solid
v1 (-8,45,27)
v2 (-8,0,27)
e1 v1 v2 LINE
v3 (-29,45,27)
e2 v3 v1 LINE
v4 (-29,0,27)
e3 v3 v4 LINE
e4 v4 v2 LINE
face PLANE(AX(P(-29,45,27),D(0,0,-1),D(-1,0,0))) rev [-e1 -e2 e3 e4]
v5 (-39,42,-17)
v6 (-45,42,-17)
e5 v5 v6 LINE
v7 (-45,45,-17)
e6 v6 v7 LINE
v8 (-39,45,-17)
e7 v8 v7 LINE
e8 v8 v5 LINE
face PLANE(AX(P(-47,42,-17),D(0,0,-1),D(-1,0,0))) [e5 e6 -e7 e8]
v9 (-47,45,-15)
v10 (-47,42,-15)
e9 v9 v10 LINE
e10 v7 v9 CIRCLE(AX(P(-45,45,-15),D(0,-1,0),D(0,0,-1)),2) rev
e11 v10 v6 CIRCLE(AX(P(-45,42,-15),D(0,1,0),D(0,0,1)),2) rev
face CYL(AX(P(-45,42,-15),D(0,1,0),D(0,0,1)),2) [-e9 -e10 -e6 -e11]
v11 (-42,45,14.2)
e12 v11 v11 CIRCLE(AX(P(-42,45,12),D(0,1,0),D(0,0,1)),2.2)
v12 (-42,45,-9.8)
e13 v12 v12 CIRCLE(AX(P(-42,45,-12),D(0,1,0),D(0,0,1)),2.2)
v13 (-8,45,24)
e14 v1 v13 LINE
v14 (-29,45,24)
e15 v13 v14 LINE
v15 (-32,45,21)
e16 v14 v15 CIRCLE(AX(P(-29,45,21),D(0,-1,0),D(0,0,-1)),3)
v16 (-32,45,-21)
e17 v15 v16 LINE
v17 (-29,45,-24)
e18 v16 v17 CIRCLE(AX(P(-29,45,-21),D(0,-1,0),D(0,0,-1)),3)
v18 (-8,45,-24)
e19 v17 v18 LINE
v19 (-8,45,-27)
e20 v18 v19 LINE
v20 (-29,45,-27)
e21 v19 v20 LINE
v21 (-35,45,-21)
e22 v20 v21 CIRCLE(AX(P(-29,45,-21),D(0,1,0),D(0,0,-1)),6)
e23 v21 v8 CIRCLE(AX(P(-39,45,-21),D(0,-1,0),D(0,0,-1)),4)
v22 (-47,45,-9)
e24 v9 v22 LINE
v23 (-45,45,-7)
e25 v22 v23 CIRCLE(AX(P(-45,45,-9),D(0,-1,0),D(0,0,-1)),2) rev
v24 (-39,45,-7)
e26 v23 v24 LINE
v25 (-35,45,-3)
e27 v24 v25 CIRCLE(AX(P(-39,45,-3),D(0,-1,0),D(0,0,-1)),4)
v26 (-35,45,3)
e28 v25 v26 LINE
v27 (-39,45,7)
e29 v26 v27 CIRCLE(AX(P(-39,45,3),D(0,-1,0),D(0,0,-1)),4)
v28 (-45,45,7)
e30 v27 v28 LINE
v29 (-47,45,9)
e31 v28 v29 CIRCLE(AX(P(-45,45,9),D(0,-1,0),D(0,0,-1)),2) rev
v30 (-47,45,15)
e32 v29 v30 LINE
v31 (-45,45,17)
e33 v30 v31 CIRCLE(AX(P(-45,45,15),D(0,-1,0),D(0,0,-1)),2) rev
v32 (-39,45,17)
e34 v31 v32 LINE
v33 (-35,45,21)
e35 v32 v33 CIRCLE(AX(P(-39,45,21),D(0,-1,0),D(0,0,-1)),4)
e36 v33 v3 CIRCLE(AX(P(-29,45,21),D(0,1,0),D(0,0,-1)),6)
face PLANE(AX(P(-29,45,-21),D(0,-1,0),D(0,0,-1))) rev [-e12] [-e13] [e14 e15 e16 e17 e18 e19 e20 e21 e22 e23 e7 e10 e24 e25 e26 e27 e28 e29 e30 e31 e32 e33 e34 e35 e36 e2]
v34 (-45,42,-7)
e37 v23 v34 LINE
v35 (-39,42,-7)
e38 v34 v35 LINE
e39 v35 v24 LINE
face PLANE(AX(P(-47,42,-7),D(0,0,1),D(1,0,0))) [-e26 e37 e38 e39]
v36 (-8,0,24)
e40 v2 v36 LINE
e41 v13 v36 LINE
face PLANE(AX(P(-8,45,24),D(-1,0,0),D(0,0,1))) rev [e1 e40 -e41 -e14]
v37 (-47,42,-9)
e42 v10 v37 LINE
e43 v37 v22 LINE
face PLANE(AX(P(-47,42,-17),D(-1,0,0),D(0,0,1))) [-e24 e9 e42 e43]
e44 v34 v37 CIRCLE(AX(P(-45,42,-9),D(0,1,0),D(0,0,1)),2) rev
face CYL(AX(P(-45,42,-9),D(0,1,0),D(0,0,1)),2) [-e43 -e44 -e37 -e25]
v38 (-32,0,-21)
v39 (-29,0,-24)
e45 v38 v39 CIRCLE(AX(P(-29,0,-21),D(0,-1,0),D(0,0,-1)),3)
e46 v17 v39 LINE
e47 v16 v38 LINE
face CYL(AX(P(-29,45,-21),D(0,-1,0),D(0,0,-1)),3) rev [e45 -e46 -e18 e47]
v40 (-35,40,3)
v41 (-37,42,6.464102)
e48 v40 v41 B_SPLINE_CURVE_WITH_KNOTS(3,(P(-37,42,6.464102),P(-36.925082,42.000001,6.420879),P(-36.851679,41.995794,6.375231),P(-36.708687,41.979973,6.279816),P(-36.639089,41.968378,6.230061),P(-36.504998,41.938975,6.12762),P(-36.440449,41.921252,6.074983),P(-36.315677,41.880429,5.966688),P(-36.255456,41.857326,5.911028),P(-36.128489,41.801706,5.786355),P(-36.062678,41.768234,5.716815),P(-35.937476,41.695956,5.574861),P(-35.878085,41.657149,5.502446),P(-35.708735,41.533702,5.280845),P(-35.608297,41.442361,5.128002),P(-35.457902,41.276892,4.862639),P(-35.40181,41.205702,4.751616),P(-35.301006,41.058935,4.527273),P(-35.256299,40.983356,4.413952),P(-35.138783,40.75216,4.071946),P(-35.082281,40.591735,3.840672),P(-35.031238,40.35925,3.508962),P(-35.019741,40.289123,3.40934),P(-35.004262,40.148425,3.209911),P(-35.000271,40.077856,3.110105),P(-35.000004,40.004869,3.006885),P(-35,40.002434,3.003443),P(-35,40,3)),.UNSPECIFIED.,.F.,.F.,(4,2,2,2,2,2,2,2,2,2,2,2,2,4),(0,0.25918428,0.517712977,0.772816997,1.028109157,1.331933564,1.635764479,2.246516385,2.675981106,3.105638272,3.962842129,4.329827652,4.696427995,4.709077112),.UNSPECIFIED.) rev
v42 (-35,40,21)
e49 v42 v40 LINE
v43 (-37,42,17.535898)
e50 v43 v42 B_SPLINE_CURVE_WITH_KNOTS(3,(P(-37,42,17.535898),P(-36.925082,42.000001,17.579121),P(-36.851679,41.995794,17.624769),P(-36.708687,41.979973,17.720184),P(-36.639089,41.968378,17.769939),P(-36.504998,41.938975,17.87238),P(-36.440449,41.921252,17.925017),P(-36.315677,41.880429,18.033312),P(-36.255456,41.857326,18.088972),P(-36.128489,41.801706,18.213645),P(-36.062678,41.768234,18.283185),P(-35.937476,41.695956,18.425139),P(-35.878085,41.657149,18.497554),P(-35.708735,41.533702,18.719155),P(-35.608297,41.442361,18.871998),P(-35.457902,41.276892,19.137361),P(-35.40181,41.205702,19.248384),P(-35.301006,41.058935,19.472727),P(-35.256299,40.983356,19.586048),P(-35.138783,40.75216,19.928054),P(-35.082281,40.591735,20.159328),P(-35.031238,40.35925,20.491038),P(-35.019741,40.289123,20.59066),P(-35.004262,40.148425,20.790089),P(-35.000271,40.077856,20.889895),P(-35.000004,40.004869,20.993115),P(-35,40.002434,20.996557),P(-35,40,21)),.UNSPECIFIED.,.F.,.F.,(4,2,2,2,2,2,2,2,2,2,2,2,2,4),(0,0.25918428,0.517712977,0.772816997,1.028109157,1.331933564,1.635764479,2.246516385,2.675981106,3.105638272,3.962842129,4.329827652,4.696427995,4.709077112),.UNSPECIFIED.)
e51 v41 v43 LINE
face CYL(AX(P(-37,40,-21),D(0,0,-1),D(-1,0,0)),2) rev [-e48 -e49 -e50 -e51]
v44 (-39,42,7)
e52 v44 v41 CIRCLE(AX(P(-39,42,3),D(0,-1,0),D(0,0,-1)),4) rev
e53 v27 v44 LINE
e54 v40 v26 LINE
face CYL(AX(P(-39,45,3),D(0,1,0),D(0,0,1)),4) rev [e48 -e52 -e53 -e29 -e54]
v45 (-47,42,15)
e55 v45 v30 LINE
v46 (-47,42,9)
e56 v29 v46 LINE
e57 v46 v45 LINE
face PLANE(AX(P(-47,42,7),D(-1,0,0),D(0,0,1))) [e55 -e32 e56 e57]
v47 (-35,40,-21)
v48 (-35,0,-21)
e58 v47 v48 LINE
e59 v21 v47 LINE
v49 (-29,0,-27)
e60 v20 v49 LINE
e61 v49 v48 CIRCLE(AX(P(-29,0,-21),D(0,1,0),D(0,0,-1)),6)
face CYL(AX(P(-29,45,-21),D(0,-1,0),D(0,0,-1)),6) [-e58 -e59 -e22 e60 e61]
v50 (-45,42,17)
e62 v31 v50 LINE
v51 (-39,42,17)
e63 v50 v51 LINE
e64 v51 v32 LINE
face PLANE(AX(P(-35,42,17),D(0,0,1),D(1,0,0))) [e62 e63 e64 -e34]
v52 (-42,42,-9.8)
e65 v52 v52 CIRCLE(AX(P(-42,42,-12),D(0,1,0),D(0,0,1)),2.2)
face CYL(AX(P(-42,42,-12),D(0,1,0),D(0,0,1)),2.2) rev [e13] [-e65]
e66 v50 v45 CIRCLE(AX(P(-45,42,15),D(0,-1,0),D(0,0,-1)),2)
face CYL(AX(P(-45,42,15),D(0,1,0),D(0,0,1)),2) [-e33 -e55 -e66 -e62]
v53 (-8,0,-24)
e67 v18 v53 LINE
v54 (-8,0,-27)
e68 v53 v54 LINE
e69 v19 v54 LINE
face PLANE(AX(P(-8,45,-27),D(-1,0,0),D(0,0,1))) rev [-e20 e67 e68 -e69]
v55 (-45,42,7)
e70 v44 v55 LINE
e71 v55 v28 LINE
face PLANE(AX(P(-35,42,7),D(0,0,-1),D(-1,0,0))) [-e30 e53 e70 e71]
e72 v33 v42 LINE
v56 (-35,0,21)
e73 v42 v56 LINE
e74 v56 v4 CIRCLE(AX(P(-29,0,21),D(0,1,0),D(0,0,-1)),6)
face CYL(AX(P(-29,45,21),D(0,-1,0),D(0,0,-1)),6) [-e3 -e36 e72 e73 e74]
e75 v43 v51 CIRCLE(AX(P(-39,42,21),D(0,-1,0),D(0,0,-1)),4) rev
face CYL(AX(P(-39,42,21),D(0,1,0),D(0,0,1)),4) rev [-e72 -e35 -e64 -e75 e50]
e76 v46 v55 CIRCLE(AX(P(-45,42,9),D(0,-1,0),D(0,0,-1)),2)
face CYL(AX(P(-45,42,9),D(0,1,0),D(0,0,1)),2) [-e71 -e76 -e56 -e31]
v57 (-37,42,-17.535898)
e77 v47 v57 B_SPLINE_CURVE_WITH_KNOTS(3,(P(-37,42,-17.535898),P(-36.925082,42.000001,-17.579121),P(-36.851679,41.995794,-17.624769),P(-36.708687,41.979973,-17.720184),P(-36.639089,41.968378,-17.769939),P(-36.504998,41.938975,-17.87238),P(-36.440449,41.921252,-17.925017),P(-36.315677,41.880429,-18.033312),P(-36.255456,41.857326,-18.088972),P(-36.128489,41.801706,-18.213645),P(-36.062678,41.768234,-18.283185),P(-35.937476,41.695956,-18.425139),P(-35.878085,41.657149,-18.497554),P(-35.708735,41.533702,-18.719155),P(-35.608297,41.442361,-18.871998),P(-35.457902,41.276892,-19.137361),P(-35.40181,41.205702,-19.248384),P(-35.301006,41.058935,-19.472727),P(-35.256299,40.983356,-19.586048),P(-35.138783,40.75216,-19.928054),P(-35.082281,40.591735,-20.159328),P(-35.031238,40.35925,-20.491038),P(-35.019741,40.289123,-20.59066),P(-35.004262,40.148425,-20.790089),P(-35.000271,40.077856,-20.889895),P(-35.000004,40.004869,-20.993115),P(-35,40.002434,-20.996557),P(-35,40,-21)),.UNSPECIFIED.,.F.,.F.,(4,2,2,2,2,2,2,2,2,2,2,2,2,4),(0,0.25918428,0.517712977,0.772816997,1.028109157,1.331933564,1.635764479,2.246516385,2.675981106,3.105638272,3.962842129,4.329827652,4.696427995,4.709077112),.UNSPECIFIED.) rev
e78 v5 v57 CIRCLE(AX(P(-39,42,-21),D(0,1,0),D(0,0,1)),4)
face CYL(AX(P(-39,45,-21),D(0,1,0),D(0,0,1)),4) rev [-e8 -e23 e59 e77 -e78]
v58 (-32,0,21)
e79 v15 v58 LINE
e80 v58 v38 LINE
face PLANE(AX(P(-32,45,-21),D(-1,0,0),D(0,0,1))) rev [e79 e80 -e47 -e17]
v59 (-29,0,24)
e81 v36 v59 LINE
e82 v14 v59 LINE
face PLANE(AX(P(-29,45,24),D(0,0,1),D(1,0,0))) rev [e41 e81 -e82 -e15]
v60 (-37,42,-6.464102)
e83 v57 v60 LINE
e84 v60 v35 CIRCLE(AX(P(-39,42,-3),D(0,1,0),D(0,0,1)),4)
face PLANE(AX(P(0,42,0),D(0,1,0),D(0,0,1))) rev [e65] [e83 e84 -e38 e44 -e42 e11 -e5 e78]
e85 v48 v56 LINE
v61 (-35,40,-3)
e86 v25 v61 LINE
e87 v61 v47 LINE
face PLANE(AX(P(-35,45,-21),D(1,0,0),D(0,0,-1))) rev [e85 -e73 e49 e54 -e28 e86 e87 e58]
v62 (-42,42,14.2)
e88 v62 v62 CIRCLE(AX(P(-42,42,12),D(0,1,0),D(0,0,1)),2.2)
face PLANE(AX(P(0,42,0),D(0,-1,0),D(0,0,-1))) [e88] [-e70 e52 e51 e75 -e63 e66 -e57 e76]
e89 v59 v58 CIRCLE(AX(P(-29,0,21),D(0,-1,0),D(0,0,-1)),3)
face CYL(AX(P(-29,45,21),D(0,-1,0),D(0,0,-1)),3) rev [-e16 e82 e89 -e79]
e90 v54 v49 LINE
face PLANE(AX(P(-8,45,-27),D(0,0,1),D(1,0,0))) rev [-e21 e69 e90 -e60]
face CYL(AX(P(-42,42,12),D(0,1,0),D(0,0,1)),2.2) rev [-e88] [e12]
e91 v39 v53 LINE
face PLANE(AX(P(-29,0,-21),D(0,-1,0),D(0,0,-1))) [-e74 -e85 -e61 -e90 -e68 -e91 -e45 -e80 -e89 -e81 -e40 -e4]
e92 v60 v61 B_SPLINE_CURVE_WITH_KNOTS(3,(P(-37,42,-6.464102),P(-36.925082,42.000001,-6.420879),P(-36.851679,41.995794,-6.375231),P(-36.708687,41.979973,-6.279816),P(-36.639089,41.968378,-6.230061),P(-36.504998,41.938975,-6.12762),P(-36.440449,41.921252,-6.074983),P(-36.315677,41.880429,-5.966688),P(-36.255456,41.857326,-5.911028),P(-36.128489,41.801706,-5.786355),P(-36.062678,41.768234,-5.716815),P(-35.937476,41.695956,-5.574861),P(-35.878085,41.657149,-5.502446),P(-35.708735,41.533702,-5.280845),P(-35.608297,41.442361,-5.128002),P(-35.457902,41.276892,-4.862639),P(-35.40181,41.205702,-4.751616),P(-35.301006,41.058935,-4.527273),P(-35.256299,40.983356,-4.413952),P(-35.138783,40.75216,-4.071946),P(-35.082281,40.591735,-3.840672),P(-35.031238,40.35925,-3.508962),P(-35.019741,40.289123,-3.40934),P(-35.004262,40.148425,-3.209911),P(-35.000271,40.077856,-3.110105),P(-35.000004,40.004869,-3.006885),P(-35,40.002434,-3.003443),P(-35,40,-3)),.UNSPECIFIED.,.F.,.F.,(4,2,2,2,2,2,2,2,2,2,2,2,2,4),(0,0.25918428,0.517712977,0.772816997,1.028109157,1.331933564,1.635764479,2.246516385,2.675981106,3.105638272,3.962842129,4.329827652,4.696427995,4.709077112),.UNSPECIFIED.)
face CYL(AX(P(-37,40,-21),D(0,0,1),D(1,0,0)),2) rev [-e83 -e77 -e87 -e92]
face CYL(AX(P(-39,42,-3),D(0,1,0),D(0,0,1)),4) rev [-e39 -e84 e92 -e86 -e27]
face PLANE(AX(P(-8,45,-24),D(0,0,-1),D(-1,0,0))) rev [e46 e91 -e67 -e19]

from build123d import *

# Parameters (mm, degrees)
BOSS_EXTRUDE1_DEPTH = 45
SKETCH4_W           = 12
SKETCH4_H           = 10
SKETCH4_R           = 2.2
BOSS_EXTRUDE2_DEPTH = 3
FILLET1_R           = 4
FILLET2_R           = 2
FILLET3_R           = 2


with BuildPart() as part:
    # Sketch3 → Boss-Extrude1 (new body)
    with BuildSketch(Plane(origin=(0, 0, 0), x_dir=(1, 0, 0), z_dir=(0, 1, 0))):
        with BuildLine():
            Line((-8, 24), (-29, 24))
            ThreePointArc((-29, 24), (-31.121320344, 23.121320344), (-32, 21))
            Line((-32, 21), (-32, -21))
            ThreePointArc((-32, -21), (-31.121320344, -23.121320344), (-29, -24))
            Line((-29, -24), (-8, -24))
            Line((-8, -24), (-8, -27))
            Line((-8, -27), (-29, -27))
            ThreePointArc((-29, -27), (-33.242640687, -25.242640687), (-35, -21))
            Line((-35, -21), (-35, 21))
            ThreePointArc((-35, 21), (-33.242640687, 25.242640687), (-29, 27))
            Line((-29, 27), (-8, 27))
            Line((-8, 27), (-8, 24))
        make_face()
    extrude(amount=BOSS_EXTRUDE1_DEPTH)

    # Sketch4 → Boss-Extrude2 (add)
    # profile 1 of 2: a face of its own
    with BuildSketch(Plane(origin=(0, 45, 0), x_dir=(1, 0, 0), z_dir=(0, 1, 0))):
        with Locations((-41, 12)):
            Rectangle(SKETCH4_W, SKETCH4_H)
        with Locations(Location((-42, 12, 0), (0, 0, 270))):
            Circle(SKETCH4_R, mode=Mode.SUBTRACT)
    # profile 2 of 2: a face of its own
    with BuildSketch(Plane(origin=(0, 45, 0), x_dir=(1, 0, 0), z_dir=(0, 1, 0))):
        with Locations((-41, -12)):
            Rectangle(SKETCH4_W, SKETCH4_H)
        with Locations(Location((-42, -12, 0), (0, 0, 270))):
            Circle(SKETCH4_R, mode=Mode.SUBTRACT)
    extrude(amount=-BOSS_EXTRUDE2_DEPTH)

    # Fillet1
    fillet1_edges = [part.edges().sort_by_distance(p)[0] for p in [
        (-35, 43.5, -17),
        (-35, 43.5, -7),
        (-35, 43.5, 7),
        (-35, 43.5, 17),
    ]]
    fillet(fillet1_edges, radius=FILLET1_R - 0.0001)  # a hair under: the kernel refuses the full size

    # Fillet2
    fillet2_edges = [part.edges().sort_by_distance(p)[0] for p in [
        (-35, 42, -12),
        (-35, 42, 12),
    ]]
    fillet(fillet2_edges, radius=FILLET2_R)

    # Fillet3
    fillet3_edges = [part.edges().sort_by_distance(p)[0] for p in [
        (-47, 43.5, -7),
        (-47, 43.5, -17),
        (-47, 43.5, 17),
        (-47, 43.5, 7),
    ]]
    fillet(fillet3_edges, radius=FILLET3_R)


solid = part.part
